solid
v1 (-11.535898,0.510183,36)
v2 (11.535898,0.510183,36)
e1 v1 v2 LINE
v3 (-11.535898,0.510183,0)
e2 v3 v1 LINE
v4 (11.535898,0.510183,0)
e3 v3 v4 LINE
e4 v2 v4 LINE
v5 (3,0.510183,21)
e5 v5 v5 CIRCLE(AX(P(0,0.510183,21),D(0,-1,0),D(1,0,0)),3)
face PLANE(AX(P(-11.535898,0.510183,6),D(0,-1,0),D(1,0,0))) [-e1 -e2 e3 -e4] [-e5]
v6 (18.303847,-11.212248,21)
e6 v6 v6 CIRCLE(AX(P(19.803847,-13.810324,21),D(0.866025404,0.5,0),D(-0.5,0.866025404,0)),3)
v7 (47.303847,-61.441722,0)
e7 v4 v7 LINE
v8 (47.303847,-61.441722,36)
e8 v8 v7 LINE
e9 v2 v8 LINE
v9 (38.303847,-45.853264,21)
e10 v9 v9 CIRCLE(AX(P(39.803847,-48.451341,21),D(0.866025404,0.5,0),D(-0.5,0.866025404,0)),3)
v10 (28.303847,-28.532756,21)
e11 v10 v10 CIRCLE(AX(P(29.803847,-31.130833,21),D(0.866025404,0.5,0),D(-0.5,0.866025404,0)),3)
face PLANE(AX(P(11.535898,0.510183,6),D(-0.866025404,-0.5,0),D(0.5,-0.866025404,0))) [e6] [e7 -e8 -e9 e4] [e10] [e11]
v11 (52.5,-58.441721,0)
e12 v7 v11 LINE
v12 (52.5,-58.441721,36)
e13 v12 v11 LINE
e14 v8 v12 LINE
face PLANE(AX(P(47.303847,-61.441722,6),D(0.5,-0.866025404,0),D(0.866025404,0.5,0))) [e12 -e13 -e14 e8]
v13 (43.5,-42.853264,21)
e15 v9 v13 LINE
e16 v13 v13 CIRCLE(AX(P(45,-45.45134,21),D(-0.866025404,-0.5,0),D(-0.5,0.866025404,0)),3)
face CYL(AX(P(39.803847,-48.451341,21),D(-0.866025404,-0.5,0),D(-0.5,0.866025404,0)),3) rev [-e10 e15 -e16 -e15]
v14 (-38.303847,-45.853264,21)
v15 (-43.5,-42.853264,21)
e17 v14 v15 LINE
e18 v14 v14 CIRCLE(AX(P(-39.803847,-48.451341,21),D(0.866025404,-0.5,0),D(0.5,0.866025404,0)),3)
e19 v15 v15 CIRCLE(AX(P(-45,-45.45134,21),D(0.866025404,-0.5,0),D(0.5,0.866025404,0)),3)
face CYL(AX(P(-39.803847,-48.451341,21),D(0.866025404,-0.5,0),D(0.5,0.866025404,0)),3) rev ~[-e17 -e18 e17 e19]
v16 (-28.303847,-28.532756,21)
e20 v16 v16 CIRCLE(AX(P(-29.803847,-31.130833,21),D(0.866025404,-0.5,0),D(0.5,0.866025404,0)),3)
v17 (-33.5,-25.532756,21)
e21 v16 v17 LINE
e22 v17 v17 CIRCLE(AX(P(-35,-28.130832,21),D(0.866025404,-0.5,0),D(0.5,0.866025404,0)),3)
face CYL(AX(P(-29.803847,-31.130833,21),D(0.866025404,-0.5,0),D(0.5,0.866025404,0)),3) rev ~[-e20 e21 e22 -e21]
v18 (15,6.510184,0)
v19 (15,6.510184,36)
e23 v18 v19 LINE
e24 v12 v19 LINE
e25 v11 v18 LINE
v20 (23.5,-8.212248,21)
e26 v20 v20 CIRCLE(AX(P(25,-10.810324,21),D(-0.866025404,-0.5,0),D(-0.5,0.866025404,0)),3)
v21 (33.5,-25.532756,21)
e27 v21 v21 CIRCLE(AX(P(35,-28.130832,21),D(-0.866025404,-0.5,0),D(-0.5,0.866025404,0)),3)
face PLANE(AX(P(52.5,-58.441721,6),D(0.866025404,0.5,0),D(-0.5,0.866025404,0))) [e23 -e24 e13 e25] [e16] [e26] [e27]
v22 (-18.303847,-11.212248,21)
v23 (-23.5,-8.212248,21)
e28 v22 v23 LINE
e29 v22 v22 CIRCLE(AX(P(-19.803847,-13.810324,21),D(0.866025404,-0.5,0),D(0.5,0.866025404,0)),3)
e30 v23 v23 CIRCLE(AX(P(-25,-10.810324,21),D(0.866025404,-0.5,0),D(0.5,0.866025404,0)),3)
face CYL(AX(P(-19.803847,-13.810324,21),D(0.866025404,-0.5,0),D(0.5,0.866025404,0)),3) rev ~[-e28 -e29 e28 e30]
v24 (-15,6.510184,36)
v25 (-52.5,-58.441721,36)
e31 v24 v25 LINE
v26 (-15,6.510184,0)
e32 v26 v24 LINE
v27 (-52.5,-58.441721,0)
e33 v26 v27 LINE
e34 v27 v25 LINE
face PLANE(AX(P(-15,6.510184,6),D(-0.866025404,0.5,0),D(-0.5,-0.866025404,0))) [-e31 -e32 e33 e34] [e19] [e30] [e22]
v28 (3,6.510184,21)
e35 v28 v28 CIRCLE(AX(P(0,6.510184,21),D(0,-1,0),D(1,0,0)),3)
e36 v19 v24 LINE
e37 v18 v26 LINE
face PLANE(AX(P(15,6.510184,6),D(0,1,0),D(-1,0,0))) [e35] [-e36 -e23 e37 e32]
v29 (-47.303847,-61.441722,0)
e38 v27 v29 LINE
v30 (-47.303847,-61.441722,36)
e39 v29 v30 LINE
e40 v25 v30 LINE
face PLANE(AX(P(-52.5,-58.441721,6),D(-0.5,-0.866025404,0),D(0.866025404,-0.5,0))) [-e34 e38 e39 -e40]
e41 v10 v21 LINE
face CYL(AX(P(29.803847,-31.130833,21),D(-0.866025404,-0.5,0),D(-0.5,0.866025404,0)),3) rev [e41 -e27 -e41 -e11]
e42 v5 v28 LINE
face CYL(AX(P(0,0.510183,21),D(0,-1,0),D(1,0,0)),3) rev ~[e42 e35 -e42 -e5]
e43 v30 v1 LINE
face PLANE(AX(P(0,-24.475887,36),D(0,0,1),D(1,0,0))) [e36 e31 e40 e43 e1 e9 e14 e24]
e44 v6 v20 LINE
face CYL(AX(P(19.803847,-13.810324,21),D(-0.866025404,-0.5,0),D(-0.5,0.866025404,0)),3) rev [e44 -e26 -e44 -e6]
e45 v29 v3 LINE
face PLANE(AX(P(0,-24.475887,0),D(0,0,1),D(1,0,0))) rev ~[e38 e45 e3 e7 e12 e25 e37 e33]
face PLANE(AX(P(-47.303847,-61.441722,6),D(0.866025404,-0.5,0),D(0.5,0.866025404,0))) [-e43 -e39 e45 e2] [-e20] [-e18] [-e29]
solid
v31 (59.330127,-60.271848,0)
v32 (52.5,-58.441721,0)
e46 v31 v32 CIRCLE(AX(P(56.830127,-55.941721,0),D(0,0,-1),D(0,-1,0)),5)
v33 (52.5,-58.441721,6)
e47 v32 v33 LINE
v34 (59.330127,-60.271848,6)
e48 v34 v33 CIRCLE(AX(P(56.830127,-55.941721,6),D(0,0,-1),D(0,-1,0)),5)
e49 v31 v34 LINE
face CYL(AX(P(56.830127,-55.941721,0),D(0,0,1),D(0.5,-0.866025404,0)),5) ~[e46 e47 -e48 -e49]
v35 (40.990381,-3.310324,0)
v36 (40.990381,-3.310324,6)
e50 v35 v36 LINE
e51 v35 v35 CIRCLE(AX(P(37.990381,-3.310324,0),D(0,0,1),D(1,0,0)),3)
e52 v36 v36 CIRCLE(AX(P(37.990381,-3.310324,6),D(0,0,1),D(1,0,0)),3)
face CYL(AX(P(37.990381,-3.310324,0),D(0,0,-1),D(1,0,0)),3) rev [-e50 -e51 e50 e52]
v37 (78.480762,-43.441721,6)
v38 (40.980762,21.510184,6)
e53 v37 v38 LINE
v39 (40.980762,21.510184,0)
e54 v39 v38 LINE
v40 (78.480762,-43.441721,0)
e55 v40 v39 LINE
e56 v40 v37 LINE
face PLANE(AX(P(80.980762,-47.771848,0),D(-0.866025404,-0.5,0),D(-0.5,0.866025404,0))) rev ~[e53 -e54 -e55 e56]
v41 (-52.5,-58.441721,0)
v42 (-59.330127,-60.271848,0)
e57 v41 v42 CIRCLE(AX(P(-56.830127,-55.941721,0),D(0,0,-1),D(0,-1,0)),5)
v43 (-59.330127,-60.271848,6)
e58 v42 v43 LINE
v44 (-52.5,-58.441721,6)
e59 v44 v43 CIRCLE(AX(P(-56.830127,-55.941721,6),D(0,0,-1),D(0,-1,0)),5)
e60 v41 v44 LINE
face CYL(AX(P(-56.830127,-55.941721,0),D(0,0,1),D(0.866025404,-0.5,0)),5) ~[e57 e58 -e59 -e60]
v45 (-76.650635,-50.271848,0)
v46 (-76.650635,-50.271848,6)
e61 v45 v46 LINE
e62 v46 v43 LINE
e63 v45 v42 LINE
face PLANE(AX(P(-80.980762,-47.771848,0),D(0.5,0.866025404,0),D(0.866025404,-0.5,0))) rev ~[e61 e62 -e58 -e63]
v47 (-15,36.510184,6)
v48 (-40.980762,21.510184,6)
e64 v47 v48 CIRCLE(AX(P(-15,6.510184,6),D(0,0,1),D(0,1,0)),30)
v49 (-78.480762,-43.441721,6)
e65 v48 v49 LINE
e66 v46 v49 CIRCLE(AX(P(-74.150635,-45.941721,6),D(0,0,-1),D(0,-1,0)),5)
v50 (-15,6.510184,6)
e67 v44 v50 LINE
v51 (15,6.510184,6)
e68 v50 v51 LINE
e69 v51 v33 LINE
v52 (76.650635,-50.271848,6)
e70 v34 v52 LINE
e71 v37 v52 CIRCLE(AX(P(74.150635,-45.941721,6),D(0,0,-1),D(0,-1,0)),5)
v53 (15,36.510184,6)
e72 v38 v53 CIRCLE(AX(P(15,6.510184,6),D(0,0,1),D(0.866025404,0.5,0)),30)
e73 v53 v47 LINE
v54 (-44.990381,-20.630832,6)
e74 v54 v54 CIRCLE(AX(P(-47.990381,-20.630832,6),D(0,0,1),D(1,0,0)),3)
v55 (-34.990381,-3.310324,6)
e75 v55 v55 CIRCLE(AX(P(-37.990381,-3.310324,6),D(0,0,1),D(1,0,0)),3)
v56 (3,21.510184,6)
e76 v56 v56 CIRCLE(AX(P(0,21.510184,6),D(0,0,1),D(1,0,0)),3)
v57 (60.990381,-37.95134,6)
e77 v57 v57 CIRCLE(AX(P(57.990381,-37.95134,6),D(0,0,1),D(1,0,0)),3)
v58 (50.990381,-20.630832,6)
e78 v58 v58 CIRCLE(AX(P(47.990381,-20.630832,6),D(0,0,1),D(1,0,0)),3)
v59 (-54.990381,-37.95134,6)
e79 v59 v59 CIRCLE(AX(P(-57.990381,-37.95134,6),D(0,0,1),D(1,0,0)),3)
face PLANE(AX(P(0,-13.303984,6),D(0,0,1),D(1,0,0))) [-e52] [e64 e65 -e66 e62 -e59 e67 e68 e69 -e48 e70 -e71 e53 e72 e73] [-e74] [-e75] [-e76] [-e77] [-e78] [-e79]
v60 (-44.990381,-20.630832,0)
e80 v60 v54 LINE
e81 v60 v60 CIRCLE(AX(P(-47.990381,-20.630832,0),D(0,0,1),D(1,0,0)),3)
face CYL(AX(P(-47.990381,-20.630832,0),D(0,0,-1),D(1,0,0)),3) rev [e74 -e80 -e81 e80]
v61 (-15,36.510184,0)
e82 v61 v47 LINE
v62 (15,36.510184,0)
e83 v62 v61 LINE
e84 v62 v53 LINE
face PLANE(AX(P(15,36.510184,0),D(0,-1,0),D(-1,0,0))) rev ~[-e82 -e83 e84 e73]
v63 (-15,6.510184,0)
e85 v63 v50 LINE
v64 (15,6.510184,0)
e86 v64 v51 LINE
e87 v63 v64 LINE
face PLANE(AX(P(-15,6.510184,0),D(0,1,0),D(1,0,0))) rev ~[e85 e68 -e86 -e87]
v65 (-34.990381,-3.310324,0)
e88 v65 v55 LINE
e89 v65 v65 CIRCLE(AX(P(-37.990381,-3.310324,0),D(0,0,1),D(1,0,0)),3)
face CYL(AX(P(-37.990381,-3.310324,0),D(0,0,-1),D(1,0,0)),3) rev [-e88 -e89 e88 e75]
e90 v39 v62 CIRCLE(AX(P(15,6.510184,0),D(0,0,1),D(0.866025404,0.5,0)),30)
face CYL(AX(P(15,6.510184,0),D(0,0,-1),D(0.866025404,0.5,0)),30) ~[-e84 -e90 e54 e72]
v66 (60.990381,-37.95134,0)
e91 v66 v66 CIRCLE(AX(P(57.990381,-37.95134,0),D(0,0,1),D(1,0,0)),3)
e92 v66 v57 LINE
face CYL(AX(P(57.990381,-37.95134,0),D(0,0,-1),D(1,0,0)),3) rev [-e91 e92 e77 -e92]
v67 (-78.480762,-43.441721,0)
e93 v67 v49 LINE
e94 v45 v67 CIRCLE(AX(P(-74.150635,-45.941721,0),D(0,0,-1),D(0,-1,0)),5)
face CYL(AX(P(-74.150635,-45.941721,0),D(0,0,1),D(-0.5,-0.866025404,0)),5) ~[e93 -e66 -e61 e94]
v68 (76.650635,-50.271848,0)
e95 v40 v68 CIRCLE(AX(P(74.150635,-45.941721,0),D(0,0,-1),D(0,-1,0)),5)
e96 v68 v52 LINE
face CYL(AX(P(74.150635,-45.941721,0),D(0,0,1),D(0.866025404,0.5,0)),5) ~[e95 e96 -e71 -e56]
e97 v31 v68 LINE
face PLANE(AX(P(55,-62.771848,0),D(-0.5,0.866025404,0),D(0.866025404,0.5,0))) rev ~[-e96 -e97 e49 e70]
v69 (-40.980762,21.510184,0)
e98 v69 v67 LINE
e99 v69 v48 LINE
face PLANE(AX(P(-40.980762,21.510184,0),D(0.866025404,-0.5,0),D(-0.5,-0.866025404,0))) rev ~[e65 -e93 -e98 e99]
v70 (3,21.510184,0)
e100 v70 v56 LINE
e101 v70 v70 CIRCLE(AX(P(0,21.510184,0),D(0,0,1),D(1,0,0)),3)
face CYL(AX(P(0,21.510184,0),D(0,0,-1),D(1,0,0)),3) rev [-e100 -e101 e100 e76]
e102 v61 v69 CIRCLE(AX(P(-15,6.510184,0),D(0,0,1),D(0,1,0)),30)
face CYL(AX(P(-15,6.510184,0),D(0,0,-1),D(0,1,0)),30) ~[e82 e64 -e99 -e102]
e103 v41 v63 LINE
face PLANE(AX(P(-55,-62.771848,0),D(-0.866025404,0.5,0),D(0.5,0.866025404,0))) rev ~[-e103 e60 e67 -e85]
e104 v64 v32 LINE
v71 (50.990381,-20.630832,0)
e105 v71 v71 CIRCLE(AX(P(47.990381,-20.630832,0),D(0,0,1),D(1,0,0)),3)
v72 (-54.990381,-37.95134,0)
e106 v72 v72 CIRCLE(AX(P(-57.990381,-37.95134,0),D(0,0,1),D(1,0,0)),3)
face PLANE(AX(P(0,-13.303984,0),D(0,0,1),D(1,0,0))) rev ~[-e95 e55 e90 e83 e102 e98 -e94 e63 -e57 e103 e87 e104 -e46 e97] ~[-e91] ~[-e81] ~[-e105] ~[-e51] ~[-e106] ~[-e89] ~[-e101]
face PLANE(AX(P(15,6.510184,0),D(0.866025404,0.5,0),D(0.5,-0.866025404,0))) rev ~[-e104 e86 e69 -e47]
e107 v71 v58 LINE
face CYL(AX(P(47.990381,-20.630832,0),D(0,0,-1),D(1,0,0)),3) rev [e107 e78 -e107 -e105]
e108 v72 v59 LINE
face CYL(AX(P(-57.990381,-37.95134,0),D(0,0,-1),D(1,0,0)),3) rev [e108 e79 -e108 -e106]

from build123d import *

# Parameters (mm, degrees)
F0_R          = 3
F1_DEPTH      = 6
F2_R          = 5
F3_R          = 5
F4_R          = 5
F5_R          = 5
F7_DEPTH      = 30
F7_DEPTH_BACK = 6
F8_R          = 3
F9_DEPTH      = 76.5570802573
F10_R         = 3
F11_DEPTH     = 36.0010005965


# Not quite as in the source:
# - a pattern or mirror of a feature is missing from the dataset's text; its kind, count and spacing are read off the source's solid


with BuildPart() as f1:
    # F0 (on Top) → F1 (new body)
    with BuildSketch(Plane.XY):
        with BuildLine():
            Line((15, 36.5101838864), (-15, 36.5101838864))
            ThreePointArc((-15, 36.5101838864), (-30, 32.490946), (-40.9807621135, 21.5101838864))
            Line((-40.9807621135, 21.5101838864), (-80.9807621135, -47.7718484163))
            Line((-80.9807621135, -47.7718484163), (-55, -62.7718484163))
            Line((-55, -62.7718484163), (-15, 6.5101838864))
            Line((-15, 6.5101838864), (15, 6.5101838864))
            Line((15, 6.5101838864), (55, -62.7718484163))
            Line((55, -62.7718484163), (80.9807621135, -47.7718484163))
            Line((80.9807621135, -47.7718484163), (40.9807621135, 21.5101838864))
            ThreePointArc((40.9807621135, 21.5101838864), (30, 32.490946), (15, 36.5101838864))
        make_face()
        with Locations((-57.9903810568, -37.9513403406)):
            Circle(F0_R, mode=Mode.SUBTRACT)
        with Locations((-47.9903810568, -20.6308322649)):
            Circle(F0_R, mode=Mode.SUBTRACT)
        with Locations((57.9903810568, -37.9513403406)):
            Circle(F0_R, mode=Mode.SUBTRACT)
        with Locations((47.9903810568, -20.6308322649)):
            Circle(F0_R, mode=Mode.SUBTRACT)
        with Locations((-37.9903810568, -3.3103241892)):
            Circle(F0_R, mode=Mode.SUBTRACT)
        with Locations((37.9903810568, -3.3103241892)):
            Circle(F0_R, mode=Mode.SUBTRACT)
        with Locations((0, 21.5101838864)):
            Circle(F0_R, mode=Mode.SUBTRACT)
    extrude(amount=F1_DEPTH)

    # F2
    f2_edges = [f1.edges().sort_by_distance(p)[0] for p in [
        (80.980762, -47.771848, 3),
    ]]
    fillet(f2_edges, radius=F2_R)

    # F3
    f3_edges = [f1.edges().sort_by_distance(p)[0] for p in [
        (55, -62.771848, 3),
    ]]
    fillet(f3_edges, radius=F3_R)

    # F4
    f4_edges = [f1.edges().sort_by_distance(p)[0] for p in [
        (-55, -62.771848, 3),
    ]]
    fillet(f4_edges, radius=F4_R)

    # F5
    f5_edges = [f1.edges().sort_by_distance(p)[0] for p in [
        (-80.980762, -47.771848, 3),
    ]]
    fillet(f5_edges, radius=F5_R)


with BuildPart() as f7:
    # F6 (on face) → F7 (new body, two sides)
    with BuildSketch(Plane.XY.offset(6)) as f7_sk:
        Polygon((52.5, -58.4417213974), (15, 6.5101838864), (-15, 6.5101838864), (-52.5, -58.4417213974), (-47.3038470608, -61.4417216956), (-11.5358980405, 0.51018329), (11.5358980405, 0.51018329), (47.3038470608, -61.4417216956), align=None)
    extrude(amount=F7_DEPTH)
    extrude(f7_sk.sketch, amount=-F7_DEPTH_BACK)

    # F8 (on face) → F9 (cut, through all)
    with BuildSketch(Plane(origin=(-8.8728393752, 5.1227362018, 0), x_dir=(0.5, 0.8660254038, 0), z_dir=(0.8660254038, -0.5, 0))):
        with Locations((-61.862015371, 21)):
            Circle(F8_R)
        with Locations((-41.862015371, 21)):
            Circle(F8_R)
        with Locations((-21.862015371, 21)):
            Circle(F8_R)
    f9 = extrude(amount=-F9_DEPTH, mode=Mode.SUBTRACT)

    # F9_copies: F9 across plane
    add(f9.mirror(Plane(origin=(0, 0, 0), x_dir=(0, 0, 1), z_dir=(1, 0, 0))), mode=Mode.SUBTRACT)

    # F10 (on face) → F11 (cut, through all)
    with BuildSketch(Plane.XZ.offset(-0.51018329)):
        with Locations((0, 21)):
            Circle(F10_R)
    extrude(amount=-F11_DEPTH, mode=Mode.SUBTRACT)


solid = Compound([f1.part, f7.part])
